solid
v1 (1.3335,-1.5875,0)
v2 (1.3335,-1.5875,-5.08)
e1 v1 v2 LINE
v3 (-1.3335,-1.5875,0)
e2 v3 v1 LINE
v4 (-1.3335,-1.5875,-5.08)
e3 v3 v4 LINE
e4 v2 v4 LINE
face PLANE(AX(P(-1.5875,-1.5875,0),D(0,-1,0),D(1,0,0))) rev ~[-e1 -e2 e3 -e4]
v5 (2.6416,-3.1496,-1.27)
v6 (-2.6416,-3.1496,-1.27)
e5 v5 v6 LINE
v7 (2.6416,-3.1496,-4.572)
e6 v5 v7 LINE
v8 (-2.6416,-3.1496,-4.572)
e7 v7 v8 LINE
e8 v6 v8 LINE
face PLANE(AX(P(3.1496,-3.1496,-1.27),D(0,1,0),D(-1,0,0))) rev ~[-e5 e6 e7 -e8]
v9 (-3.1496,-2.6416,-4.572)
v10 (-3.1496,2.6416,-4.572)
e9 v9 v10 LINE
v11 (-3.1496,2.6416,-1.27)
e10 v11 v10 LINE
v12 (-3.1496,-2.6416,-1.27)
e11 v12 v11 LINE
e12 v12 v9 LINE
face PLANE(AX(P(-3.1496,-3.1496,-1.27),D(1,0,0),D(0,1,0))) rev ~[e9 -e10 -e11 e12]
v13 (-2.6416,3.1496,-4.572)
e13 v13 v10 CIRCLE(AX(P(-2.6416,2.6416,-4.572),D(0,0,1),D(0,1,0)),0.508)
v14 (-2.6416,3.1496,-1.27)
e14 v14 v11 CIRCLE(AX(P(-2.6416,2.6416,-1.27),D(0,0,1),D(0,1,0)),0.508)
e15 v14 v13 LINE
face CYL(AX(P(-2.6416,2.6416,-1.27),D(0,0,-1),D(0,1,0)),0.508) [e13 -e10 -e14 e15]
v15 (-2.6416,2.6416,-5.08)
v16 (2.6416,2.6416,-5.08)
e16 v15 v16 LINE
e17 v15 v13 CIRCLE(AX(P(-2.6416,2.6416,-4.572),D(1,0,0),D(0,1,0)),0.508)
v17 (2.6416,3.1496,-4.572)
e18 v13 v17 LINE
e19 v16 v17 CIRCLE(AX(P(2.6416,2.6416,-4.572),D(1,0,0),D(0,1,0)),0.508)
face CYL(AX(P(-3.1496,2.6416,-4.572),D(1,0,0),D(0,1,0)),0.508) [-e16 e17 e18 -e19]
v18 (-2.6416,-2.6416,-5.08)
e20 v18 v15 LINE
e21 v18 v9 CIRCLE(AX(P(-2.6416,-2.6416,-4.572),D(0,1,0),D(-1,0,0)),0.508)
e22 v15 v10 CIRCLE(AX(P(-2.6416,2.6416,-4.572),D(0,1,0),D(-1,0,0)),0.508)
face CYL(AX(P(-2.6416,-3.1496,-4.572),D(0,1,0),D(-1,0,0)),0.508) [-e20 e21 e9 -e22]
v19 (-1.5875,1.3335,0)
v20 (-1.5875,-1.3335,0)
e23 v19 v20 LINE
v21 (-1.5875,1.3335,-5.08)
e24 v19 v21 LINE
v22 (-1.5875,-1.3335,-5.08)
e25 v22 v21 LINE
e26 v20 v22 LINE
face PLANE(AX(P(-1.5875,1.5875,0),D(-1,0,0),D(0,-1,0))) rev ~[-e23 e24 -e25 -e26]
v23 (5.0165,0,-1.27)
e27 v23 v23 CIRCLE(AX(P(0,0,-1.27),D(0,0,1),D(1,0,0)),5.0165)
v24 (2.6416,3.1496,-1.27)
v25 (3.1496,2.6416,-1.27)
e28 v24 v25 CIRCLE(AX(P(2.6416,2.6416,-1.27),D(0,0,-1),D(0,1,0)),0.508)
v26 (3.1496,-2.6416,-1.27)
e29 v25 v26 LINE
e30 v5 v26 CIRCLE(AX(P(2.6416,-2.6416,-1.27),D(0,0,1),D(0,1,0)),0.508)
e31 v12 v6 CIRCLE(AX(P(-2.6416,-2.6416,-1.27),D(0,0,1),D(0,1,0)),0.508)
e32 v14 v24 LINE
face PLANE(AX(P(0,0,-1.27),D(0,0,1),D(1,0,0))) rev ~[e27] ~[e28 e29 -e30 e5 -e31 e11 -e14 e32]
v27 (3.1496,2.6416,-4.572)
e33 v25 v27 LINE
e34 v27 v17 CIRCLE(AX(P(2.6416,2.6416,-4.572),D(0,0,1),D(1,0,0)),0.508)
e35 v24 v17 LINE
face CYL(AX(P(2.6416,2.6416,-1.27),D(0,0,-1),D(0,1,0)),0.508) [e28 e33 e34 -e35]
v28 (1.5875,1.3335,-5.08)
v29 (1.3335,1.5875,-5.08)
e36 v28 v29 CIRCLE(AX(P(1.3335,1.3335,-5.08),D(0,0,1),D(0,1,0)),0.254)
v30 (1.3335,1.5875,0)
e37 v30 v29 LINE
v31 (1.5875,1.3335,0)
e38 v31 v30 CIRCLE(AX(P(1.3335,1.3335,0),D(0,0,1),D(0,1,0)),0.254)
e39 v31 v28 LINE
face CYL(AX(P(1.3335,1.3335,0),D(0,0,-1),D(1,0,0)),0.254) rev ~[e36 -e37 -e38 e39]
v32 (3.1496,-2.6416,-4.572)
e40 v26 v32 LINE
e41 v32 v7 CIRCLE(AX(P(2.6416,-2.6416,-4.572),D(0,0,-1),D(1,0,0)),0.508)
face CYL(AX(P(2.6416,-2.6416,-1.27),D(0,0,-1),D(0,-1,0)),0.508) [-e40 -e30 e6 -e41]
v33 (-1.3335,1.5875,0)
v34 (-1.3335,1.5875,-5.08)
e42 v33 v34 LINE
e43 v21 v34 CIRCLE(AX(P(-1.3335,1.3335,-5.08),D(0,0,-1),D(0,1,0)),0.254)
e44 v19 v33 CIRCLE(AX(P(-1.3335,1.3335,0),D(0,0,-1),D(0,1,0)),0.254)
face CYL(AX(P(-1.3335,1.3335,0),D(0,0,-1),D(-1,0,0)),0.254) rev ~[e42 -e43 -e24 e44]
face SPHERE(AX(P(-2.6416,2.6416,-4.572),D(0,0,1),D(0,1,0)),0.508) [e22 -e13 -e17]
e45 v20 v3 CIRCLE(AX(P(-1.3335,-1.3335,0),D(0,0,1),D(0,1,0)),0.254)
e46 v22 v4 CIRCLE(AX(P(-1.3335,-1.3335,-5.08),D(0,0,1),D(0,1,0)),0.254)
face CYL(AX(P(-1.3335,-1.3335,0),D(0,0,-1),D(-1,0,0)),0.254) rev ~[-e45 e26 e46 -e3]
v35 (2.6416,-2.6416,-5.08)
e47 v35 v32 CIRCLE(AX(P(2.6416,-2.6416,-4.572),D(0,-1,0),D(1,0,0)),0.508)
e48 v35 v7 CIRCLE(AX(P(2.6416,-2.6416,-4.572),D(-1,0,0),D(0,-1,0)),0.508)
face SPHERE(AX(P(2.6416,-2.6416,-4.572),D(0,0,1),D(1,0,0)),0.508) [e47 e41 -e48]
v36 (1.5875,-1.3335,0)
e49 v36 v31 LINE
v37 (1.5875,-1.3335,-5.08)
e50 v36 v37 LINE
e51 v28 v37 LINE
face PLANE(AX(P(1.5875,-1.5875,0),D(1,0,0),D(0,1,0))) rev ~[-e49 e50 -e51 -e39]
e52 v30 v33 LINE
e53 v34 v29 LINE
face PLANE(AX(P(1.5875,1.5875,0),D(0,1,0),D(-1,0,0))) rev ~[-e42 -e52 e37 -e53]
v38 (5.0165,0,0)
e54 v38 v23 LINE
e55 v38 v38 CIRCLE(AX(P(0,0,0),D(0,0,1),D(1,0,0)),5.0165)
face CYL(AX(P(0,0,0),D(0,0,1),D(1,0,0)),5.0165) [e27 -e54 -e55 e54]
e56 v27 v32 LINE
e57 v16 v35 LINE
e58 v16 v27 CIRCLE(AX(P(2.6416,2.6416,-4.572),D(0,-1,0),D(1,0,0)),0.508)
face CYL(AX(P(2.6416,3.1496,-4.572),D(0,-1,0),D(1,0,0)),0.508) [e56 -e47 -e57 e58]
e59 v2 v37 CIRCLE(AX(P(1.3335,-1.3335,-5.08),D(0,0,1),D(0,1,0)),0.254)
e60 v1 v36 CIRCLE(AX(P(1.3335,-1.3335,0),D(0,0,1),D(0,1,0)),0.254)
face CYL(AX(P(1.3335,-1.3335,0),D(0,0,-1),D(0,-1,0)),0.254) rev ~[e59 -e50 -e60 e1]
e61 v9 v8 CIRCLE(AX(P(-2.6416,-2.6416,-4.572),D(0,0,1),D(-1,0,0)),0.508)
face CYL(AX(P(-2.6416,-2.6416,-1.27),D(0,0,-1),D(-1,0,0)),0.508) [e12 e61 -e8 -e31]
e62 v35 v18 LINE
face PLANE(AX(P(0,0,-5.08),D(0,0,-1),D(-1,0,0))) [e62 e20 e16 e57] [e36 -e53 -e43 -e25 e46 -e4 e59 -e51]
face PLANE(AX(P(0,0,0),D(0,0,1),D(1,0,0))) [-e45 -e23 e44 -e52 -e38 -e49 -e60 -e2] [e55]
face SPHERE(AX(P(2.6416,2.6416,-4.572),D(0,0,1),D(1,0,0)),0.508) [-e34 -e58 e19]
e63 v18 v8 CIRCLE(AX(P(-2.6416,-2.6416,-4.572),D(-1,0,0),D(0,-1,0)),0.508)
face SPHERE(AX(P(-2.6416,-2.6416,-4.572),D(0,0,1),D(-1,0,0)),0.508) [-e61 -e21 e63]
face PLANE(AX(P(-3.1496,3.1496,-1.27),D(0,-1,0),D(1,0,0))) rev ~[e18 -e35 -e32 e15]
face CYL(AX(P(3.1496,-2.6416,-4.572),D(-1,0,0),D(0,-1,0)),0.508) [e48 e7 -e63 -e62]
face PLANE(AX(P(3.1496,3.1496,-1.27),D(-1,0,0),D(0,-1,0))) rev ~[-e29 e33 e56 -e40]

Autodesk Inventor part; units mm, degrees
ref_plane "YZ Plane" through (0, 0, 0) normal (1, 0, 0) x (0, 1, 0)
ref_plane "XZ Plane" through (0, 0, 0) normal (0, 1, 0) x (-1, 0, 0)
ref_plane "XY Plane" through (0, 0, 0) normal (0, 0, 1) x (1, 0, 0)
sketch "Sketch1" plane through (0, 0, 0) normal (0, 0, 1) x (1, 0, 0)
  circle A0 centre (0, 0) radius 5.0165
  dimension "d0" = 10.033
extrude "Extrusion1" add sketch "Sketch1" against normal blind 1.27
sketch "Sketch2" plane through (0, 0, -1.27) normal (0, 0, -1) x (-1, 0, 0)
  circle A0 centre (0, 0) radius 5.0165 projected
  line L0 (-3.1496, -3.1496) -> (3.1496, -3.1496)
  line L1 (3.1496, -3.1496) -> (3.1496, 3.1496)
  line L2 (3.1496, 3.1496) -> (-3.1496, 3.1496)
  line L3 (-3.1496, 3.1496) -> (-3.1496, -3.1496)
  point P0 (0, 3.1496)
  point P1 (-3.1496, 0)
  dimension "d3" = 6.2992
extrude "Extrusion2" add sketch "Sketch2" along normal blind 3.81 contours L3 L2 L1 L0
fillet "Fillet1" radius 0.508 8 edges at (3.1496, 3.1496, -3.175) (-3.1496, 3.1496, -3.175) (-3.1496, -3.1496, -3.175) (3.1496, -3.1496, -3.175) (3.1496, 0, -5.08) (0, 3.1496, -5.08) (-3.1496, 0, -5.08) (0, -3.1496, -5.08)
sketch "Sketch4" plane through (0, 0, 0) normal (0, 0, 1) x (1, 0, 0)
  circle A0 centre (0, 0) radius 5.0165 projected
  line L0 (-1.5875, -1.5875) -> (1.5875, -1.5875)
  line L1 (1.5875, -1.5875) -> (1.5875, 1.5875)
  line L2 (1.5875, 1.5875) -> (-1.5875, 1.5875)
  line L3 (-1.5875, 1.5875) -> (-1.5875, -1.5875)
  point P0 (0, 1.5875)
  point P1 (-1.5875, 0)
  dimension "d14" = 3.175
extrude "Extrusion3" cut sketch "Sketch4" against normal through all contours L3 L2 L1 L0
fillet "Fillet2" radius 0.254 4 edges at (-1.5875, 1.5875, -2.54) (1.5875, 1.5875, -2.54) (-1.5875, -1.5875, -2.54) (1.5875, -1.5875, -2.54)
sketch "Sketch5" plane through (0, 0, 0) normal (0, 0, 1) x (1, 0, 0)
  line L0 (-1.3335, 1.5875) -> (1.3335, 1.5875) projected
  circle A0 centre (0, 0) radius 5.0165 projected
  circle A1 centre (0, 0) radius 1.5875
surface extrude "ExtrusionSrf1" sketch "Sketch5" against normal up to surface (5.08 mm away) shown no curves A1
properties part number "High Strength Square Gear Insert" material "Acetal Resin, White"
